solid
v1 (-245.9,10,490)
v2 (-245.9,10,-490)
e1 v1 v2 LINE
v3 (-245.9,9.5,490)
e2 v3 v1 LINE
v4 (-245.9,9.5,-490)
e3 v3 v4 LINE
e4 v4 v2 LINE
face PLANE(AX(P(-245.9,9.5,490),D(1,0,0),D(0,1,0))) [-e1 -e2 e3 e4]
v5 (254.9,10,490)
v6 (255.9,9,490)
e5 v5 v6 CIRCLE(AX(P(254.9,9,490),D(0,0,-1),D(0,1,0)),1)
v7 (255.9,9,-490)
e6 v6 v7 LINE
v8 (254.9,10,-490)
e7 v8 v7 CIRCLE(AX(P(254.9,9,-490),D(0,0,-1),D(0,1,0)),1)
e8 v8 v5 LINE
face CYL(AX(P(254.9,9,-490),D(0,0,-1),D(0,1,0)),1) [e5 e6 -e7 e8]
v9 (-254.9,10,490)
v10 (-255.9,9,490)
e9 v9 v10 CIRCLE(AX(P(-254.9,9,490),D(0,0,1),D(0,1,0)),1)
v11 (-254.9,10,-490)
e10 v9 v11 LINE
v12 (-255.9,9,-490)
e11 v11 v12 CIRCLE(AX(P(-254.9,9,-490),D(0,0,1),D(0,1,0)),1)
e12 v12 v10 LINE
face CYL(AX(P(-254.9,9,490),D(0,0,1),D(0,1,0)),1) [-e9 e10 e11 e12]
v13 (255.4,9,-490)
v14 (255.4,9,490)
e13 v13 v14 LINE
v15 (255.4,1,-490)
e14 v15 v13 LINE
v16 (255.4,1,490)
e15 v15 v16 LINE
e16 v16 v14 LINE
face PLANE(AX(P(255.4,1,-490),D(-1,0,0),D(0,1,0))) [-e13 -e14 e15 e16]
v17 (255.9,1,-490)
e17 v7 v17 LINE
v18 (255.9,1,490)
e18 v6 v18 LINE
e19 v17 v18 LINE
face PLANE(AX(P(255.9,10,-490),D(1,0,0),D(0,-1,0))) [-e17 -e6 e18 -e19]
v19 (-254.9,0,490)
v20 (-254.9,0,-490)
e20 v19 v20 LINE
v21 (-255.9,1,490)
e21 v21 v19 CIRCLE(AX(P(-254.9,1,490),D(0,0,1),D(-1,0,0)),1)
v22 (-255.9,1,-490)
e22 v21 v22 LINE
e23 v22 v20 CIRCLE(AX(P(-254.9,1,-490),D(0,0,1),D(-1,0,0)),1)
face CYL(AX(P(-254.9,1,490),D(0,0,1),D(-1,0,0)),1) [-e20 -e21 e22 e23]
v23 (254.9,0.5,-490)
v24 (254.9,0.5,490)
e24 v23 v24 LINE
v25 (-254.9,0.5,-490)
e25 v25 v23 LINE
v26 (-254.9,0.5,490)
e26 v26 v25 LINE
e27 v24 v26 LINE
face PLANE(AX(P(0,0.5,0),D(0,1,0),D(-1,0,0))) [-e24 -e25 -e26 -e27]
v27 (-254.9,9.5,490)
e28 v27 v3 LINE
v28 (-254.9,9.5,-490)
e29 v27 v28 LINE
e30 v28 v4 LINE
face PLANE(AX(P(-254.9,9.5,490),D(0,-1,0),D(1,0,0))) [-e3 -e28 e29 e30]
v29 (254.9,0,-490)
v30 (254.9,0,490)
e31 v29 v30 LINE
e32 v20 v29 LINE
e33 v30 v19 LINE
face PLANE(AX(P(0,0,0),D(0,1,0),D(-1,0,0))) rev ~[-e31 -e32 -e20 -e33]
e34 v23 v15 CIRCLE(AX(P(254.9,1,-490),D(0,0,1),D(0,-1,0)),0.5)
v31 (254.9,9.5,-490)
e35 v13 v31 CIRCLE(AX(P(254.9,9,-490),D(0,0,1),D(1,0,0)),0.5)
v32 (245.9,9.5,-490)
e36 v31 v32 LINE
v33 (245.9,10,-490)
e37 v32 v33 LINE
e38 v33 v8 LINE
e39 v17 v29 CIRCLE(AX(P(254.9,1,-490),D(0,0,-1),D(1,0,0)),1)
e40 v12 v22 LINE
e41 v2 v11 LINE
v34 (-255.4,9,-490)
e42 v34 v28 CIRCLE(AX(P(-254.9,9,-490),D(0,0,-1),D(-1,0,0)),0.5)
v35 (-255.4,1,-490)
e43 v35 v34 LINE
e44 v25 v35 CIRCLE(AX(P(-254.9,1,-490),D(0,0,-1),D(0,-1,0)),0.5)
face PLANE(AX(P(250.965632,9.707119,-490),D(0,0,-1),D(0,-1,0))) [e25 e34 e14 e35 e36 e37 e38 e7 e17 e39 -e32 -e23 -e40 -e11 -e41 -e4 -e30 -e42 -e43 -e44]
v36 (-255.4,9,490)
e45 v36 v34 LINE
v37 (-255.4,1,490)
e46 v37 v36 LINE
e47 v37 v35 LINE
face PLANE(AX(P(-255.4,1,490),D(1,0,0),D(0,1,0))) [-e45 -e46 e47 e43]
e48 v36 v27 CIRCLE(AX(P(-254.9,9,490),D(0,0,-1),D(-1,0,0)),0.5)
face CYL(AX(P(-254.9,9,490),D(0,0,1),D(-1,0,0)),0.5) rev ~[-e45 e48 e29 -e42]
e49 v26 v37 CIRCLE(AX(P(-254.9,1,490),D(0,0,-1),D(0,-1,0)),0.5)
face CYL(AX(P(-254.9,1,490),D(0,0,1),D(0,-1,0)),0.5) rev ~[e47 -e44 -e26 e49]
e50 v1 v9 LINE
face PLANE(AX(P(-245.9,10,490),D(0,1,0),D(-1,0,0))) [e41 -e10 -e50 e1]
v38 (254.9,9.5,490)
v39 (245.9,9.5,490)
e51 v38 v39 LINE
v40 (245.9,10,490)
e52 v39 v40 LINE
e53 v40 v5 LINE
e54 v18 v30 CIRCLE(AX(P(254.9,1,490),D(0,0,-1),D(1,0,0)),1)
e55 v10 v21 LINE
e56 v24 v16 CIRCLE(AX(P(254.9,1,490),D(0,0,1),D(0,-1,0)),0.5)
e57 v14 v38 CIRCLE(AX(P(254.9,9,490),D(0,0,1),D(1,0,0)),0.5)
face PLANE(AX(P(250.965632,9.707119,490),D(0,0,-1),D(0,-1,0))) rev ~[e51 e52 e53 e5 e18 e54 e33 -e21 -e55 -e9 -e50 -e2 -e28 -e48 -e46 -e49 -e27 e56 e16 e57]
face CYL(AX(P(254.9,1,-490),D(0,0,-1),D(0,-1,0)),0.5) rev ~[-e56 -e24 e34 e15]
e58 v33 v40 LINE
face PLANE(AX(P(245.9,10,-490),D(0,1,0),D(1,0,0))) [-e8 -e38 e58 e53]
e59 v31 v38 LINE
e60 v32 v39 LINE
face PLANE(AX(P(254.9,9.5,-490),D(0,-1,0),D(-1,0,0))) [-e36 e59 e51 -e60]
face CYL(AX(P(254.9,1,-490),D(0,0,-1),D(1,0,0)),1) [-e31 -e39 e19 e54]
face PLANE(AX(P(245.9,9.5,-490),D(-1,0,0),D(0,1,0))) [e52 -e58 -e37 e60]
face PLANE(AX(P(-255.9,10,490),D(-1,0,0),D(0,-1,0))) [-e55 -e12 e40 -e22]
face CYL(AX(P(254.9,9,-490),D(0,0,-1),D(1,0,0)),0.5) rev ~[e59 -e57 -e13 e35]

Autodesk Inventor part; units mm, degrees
ref_plane "YZ Plane" through (0, 0, 0) normal (1, 0, 0) x (0, 1, 0)
ref_plane "XZ Plane" through (0, 0, 0) normal (0, 1, 0) x (-1, 0, 0)
ref_plane "XY Plane" through (0, 0, 0) normal (0, 0, 1) x (1, 0, 0)
sketch "Sketch6" plane through (0, 0, 0) normal (0, 1, 0) x (-1, 0, 0)
  line L0 (255.9, -490) -> (-255.9, -490)
  line L1 (-255.9, -490) -> (-255.9, 490)
  line L2 (-255.9, 490) -> (255.9, 490)
  line L3 (255.9, 490) -> (255.9, -490)
  line L4 (255.9, -490) -> (-255.9, 490) construction
  line L5 (-255.9, -490) -> (255.9, 490) construction
  point P0 (0, 0)
  dimension "d52" = 511.8
  dimension "d53" = 980
extrude "Plate2" add sketch "Sketch6" along normal blind 0.5
sketch "Sketch11" plane through (-255.4, 0, 490) normal (-1, 0, 0) x (0, -1, 0)
  line L0 (0, -980) -> (0, 0)
  line L1 (0, 0) -> (-10, 0)
  line L2 (-10, 0) -> (-10, -980)
  line L3 (-10, -980) -> (0, -980)
edge flange "Flange2" height 10 angle 90 thickness 0.5 bend radius 0.5 thickness toward (-1, 0, 0) relief tear relief width 0.5 relief depth 0.25 edges at (-255.9, 0.5, 0) wall of the first edge with corners at (-255.4, 0, -490) (-255.4, 0, 490) (-255.4, 10, 490) (-255.4, 10, -490)
bend "Bend3"
corner "Corner3"
sketch "Sketch12" plane through (-255.9, 9.5, 490) normal (0, 1, 0) x (-1, 0, 0)
  line L0 (0, -980) -> (0, 0)
  line L1 (0, 0) -> (-10, 0)
  line L2 (-10, 0) -> (-10, -980)
  line L3 (-10, -980) -> (0, -980)
edge flange "Flange3" height 10 angle 90 thickness 0.5 bend radius 0.5 thickness toward (0, 1, 0) relief tear relief width 0.5 relief depth 0.25 edges at (-255.4, 10, 0) wall of the first edge with corners at (-255.9, 9.5, -490) (-255.9, 9.5, 490) (-245.9, 9.5, 490) (-245.9, 9.5, -490)
bend "Bend4"
corner "Corner4"
sketch "Sketch13" plane through (255.4, 0, -490) normal (1, 0, 0) x (0, 1, 0)
  line L0 (0, 980) -> (0, 0)
  line L1 (0, 0) -> (10, 0)
  line L2 (10, 0) -> (10, 980)
  line L3 (10, 980) -> (0, 980)
edge flange "Flange4" height 10 angle 90 thickness 0.5 bend radius 0.5 thickness toward (1, 0, 0) relief tear relief width 0.5 relief depth 0.25 edges at (255.9, 0.5, 0) wall of the first edge with corners at (255.4, 0, 490) (255.4, 0, -490) (255.4, 10, -490) (255.4, 10, 490)
bend "Bend5"
corner "Corner5"
sketch "Sketch14" plane through (255.9, 9.5, -490) normal (0, 1, 0) x (-1, 0, 0)
  line L0 (0, 980) -> (0, 0)
  line L1 (0, 0) -> (10, 0)
  line L2 (10, 0) -> (10, 980)
  line L3 (10, 980) -> (0, 980)
edge flange "Flange5" height 10 angle 90 thickness 0.5 bend radius 0.5 thickness toward (0, 1, 0) relief tear relief width 0.5 relief depth 0.25 edges at (255.4, 10, 0) wall of the first edge with corners at (255.9, 9.5, 490) (255.9, 9.5, -490) (245.9, 9.5, -490) (245.9, 9.5, 490)
bend "Bend6"
corner "Corner6"
equation "\"d52\" = ЖАБРЫ_базовая_ширина - 4 * ЖАБРЫ_шаг_листов"
equation "\"d53\" = ЖАБРЫ_базовая_длина_кор_лист"
equation "\"d54\" = Thickness"
equation "\"d84\" = BendReliefWidth"
equation "\"d85\" = BendReliefDepth"
equation "\"d86\" = MinimumRemnant"
equation "\"d87\" = TransitionRadius"
equation "\"d90\" = BendRadius"
equation "\"d91\" = CornerReliefSize"
equation "\"d92\" = GapSize"
equation "\"d93\" = JacobiRadiusSize"
equation "\"d94\" = BendReliefWidth"
equation "\"d95\" = BendReliefDepth"
equation "\"d96\" = MinimumRemnant"
equation "\"d97\" = TransitionRadius"
equation "\"d100\" = BendRadius"
equation "\"d101\" = CornerReliefSize"
equation "\"d102\" = GapSize"
equation "\"d103\" = JacobiRadiusSize"
equation "\"d104\" = BendReliefWidth"
equation "\"d105\" = BendReliefDepth"
equation "\"d106\" = MinimumRemnant"
equation "\"d107\" = TransitionRadius"
equation "\"d110\" = BendRadius"
equation "\"d111\" = CornerReliefSize"
equation "\"d112\" = GapSize"
equation "\"d113\" = JacobiRadiusSize"
equation "\"d114\" = BendReliefWidth"
equation "\"d115\" = BendReliefDepth"
equation "\"d116\" = MinimumRemnant"
equation "\"d117\" = TransitionRadius"
equation "\"d120\" = BendRadius"
equation "\"d121\" = CornerReliefSize"
equation "\"d122\" = GapSize"
equation "\"d123\" = JacobiRadiusSize"
equation "\"BendRadius\" = Thickness"
equation "\"BendReliefWidth\" = Thickness"
equation "\"BendReliefDepth\" = 0.5 * Thickness"
equation "\"CornerReliefSize\" = 4 * Thickness"
equation "\"MinimumRemnant\" = 2 * Thickness"
equation "\"TransitionRadius\" = BendRadius"
equation "\"JacobiRadiusSize\" = BendRadius"
equation "\"GapSize\" = Thickness"
equation "\"ЖАБРЫ_базовая_ширина\" = 915"
equation "\"ЖАБРЫ_шаг_листов\" = 100.8"
equation "\"ЖАБРЫ_базовая_длина_кор_лист\" = 980"
equation "\"Thickness\" = 0.5"
properties part number "MSC 809 sheet gills" material "Stainless Steel"
